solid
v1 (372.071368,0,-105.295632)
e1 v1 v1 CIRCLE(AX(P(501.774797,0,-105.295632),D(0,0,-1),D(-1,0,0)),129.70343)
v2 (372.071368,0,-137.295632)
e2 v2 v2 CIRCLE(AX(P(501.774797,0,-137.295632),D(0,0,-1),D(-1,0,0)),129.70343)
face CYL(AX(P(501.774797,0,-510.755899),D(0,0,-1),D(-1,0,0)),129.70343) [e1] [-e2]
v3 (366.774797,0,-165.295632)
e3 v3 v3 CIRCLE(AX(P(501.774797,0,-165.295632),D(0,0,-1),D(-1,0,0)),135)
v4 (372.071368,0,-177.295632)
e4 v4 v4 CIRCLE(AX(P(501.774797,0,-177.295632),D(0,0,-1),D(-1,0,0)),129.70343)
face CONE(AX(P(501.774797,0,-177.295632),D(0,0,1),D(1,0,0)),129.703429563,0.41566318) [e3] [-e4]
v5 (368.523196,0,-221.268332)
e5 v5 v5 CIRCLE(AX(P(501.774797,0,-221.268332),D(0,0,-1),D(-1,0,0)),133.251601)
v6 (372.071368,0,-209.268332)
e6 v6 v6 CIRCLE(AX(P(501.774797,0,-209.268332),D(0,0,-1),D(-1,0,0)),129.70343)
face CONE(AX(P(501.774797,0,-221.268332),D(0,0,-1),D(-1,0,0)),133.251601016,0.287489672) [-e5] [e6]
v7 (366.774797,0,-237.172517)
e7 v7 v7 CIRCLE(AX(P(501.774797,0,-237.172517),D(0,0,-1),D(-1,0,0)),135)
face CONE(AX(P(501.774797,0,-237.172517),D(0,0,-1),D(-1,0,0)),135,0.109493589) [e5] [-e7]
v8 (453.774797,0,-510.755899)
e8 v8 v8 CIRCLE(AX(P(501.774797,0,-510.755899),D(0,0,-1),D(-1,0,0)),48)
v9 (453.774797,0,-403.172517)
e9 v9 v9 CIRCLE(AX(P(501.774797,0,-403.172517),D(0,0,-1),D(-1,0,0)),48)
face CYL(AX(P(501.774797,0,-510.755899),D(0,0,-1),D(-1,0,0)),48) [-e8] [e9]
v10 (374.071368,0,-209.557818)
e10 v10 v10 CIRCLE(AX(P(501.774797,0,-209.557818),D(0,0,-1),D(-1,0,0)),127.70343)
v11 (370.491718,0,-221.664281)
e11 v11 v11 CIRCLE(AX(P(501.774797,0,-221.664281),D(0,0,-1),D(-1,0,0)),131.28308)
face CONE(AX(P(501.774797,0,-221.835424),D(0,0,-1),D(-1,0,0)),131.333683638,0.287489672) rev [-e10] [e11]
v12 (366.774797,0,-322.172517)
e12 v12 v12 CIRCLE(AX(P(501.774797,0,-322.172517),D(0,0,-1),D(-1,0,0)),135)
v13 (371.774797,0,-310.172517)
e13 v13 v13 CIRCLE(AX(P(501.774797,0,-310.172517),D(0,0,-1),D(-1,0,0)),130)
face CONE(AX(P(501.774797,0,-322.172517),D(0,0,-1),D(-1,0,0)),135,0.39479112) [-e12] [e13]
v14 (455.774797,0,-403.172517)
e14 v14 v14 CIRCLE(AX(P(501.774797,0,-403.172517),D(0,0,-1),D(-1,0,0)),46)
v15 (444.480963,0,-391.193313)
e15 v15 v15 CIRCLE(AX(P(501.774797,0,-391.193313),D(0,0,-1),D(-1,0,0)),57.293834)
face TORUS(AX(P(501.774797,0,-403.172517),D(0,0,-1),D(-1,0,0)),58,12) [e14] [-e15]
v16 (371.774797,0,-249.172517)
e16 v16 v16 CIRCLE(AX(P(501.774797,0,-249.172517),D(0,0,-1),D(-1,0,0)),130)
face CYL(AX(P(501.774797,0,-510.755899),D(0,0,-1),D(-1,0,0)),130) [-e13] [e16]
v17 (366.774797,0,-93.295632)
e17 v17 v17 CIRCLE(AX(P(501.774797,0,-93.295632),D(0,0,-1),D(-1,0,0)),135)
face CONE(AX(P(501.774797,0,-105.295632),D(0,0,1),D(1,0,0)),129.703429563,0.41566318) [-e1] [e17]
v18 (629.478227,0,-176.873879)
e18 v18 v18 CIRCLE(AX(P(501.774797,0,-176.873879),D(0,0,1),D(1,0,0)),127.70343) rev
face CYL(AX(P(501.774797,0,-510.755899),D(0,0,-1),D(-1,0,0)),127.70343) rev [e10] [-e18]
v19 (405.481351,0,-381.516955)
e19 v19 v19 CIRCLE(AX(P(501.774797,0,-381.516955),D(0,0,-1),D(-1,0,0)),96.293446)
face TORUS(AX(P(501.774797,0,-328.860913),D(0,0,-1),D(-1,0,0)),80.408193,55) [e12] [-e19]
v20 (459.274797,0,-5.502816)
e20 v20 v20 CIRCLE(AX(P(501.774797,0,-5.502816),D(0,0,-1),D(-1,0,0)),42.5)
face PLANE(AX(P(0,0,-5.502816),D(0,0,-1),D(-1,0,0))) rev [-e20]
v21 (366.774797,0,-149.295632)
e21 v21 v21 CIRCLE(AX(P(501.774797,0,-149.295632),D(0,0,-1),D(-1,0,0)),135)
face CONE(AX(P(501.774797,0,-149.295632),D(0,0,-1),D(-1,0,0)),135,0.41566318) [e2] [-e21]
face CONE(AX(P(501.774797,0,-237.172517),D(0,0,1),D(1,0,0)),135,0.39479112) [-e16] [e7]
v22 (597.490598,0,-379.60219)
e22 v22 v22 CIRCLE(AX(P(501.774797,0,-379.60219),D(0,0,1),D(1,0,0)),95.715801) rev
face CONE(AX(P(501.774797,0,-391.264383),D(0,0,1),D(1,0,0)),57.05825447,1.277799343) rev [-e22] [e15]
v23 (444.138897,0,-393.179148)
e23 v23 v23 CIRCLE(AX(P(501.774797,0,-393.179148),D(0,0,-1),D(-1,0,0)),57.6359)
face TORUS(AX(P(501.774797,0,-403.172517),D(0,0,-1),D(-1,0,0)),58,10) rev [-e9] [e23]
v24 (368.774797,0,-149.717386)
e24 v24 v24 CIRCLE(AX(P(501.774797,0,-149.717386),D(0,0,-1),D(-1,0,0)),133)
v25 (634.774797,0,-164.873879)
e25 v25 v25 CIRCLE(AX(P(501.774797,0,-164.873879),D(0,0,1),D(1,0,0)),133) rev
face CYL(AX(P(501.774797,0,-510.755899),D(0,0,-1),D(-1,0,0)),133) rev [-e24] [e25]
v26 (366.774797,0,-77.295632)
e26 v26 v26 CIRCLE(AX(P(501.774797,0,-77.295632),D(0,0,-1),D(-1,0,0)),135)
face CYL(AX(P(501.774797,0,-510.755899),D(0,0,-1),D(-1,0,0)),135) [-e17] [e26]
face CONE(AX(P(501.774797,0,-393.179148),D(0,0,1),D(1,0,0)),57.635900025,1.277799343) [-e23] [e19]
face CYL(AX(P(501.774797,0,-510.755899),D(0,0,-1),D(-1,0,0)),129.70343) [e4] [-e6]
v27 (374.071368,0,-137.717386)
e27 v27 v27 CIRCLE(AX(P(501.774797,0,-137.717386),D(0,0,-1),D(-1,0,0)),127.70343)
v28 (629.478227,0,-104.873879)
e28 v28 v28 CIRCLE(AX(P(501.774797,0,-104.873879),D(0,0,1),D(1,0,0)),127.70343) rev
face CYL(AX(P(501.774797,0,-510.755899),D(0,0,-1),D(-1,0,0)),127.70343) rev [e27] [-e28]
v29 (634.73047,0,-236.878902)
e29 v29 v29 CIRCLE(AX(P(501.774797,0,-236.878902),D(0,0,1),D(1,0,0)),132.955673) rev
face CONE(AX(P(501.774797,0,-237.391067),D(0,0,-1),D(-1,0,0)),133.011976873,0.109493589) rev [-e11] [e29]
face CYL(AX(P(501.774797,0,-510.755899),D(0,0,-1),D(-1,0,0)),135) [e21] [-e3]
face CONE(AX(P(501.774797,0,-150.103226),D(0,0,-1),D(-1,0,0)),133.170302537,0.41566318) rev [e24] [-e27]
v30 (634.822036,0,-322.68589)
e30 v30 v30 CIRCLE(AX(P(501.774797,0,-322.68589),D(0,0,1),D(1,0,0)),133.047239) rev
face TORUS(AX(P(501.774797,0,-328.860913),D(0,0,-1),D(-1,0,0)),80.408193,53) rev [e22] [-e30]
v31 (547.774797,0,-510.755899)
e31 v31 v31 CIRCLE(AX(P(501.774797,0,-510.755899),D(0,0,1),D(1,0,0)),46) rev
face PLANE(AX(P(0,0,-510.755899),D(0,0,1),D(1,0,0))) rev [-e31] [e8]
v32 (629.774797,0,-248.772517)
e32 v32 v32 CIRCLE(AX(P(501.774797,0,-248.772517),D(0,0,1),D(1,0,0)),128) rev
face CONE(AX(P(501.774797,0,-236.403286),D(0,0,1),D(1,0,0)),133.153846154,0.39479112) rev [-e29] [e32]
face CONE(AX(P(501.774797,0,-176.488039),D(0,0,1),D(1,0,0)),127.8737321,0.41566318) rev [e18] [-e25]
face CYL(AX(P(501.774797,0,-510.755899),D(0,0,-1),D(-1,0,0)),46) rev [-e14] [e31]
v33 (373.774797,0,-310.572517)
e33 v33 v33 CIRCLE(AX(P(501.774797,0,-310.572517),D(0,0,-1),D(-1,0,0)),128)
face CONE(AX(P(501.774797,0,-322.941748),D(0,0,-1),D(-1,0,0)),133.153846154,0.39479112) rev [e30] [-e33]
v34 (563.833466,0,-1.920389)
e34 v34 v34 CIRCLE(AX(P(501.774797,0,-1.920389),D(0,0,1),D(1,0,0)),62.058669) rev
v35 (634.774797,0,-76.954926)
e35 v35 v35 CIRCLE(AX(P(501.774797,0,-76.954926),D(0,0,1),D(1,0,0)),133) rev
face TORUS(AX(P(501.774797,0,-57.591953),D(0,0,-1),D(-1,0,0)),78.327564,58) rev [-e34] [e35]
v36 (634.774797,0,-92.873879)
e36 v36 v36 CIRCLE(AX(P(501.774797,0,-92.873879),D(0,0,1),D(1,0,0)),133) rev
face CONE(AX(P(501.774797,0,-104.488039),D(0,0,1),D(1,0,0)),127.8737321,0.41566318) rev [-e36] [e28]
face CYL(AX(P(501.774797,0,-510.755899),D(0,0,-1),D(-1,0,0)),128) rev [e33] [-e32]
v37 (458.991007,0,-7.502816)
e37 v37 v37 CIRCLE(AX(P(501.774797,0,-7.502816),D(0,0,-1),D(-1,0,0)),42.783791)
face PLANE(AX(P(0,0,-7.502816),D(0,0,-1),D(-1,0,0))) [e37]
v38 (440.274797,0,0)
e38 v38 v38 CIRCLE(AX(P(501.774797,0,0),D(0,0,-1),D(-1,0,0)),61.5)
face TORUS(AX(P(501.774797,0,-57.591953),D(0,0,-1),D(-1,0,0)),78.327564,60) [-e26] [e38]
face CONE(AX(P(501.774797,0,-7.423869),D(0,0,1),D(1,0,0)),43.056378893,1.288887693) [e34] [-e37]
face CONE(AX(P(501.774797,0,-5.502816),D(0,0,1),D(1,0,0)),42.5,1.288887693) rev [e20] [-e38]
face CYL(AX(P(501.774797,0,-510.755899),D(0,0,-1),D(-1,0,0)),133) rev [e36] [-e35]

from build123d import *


# Read off the part's stored shape, not the designer's step: Shell1
with BuildPart() as part:
    # Sketch1 → Revolve2 (revolve)
    with BuildSketch(Plane(origin=(0, 0, 0), x_dir=(1, 0, 0), z_dir=(0, 1, 0)), mode=Mode.PRIVATE) as revolve2_sk:
        with BuildLine():
            Line((544.274797421, 5.502816416), (563.274797421, 0))
            ThreePointArc((563.274797421, 0), (623.582898909, 16.246544551), (636.774797421, 77.295632411))
            Line((636.774797421, 77.295632411), (636.774797421, 93.295632411))
            Line((636.774797421, 93.295632411), (631.478226984, 105.295632411))
            Line((631.478226984, 105.295632411), (631.478226984, 137.295632411))
            Line((631.478226984, 137.295632411), (636.774797421, 149.295632411))
            Line((636.774797421, 149.295632411), (636.774797421, 165.295632411))
            Line((636.774797421, 165.295632411), (631.478226984, 177.295632411))
            Line((631.478226984, 177.295632411), (631.478226984, 209.268332016))
            Line((631.478226984, 209.268332016), (635.026398437, 221.268332016))
            Line((635.026398437, 221.268332016), (636.774797421, 237.172517031))
            Line((636.774797421, 237.172517031), (631.774797421, 249.172517031))
            Line((631.774797421, 249.172517031), (631.774797421, 310.172517031))
            Line((631.774797421, 310.172517031), (636.774797421, 322.172517031))
            ThreePointArc((636.774797421, 322.172517031), (628.250273774, 358.907634295), (598.068243539, 381.516955266))
            Line((598.068243539, 381.516955266), (559.410697446, 393.179147668))
            ThreePointArc((559.410697446, 393.179147668), (552.576151724, 396.231371583), (549.774797421, 403.172517031))
            Line((549.774797421, 403.172517031), (549.774797421, 510.755898755))
            Line((549.774797421, 510.755898755), (501.774797421, 510.755898755))
            Line((501.774797421, 510.755898755), (501.774797421, 5.502816416))
            Line((501.774797421, 5.502816416), (544.274797421, 5.502816416))
        make_face()
    revolve(revolve2_sk.sketch.rotate(Axis((501.774797421, 0, -510.755898755), (0, 0, 1)), 180), axis=Axis((501.774797421, 0, -510.755898755), (0, 0, 1)))

    # Shell1 outline → Shell1 (revolve, cut)
    with BuildSketch(Plane(origin=(501.774797421, 0, 0), x_dir=(1, 0, 0), z_dir=(0, -1, 0))):
        with BuildLine():
            Line((46, -510.755898755), (46, -403.172517031))
            ThreePointArc((46, -403.172517031), (49.268620028, -394.940688329), (57.293833963, -391.193312987))
            Line((57.293833963, -391.193312987), (95.715800563, -379.602190107))
            ThreePointArc((95.715800563, -379.602190107), (124.725833298, -357.928881841), (133.047238553, -322.685889558))
            Line((133.047238553, -322.685889558), (128, -310.572517031))
            Line((128, -310.572517031), (128, -248.772517031))
            Line((128, -248.772517031), (132.955672917, -236.878902031))
            Line((132.955672917, -236.878902031), (131.283079917, -221.664280672))
            Line((131.283079917, -221.664280672), (127.703429563, -209.557818284))
            Line((127.703429563, -209.557818284), (127.703429563, -176.873879275))
            Line((127.703429563, -176.873879275), (133, -164.873879275))
            Line((133, -164.873879275), (133, -149.717385547))
            Line((133, -149.717385547), (127.703429563, -137.717385547))
            Line((127.703429563, -137.717385547), (127.703429563, -104.873879275))
            Line((127.703429563, -104.873879275), (133, -92.873879275))
            Line((133, -92.873879275), (133, -76.954926098))
            ThreePointArc((133, -76.954926098), (120.473185429, -17.745415679), (62.058668867, -1.920389226))
            Line((62.058668867, -1.920389226), (42.783790589, -7.502816416))
            Line((42.783790589, -7.502816416), (0, -7.502816416))
            Line((0, -7.502816416), (0, -510.755898755))
            Line((0, -510.755898755), (46, -510.755898755))
        make_face()
    revolve(axis=Axis((501.774797421, 0, 0), (0, 0, 1)), mode=Mode.SUBTRACT)


solid = part.part
